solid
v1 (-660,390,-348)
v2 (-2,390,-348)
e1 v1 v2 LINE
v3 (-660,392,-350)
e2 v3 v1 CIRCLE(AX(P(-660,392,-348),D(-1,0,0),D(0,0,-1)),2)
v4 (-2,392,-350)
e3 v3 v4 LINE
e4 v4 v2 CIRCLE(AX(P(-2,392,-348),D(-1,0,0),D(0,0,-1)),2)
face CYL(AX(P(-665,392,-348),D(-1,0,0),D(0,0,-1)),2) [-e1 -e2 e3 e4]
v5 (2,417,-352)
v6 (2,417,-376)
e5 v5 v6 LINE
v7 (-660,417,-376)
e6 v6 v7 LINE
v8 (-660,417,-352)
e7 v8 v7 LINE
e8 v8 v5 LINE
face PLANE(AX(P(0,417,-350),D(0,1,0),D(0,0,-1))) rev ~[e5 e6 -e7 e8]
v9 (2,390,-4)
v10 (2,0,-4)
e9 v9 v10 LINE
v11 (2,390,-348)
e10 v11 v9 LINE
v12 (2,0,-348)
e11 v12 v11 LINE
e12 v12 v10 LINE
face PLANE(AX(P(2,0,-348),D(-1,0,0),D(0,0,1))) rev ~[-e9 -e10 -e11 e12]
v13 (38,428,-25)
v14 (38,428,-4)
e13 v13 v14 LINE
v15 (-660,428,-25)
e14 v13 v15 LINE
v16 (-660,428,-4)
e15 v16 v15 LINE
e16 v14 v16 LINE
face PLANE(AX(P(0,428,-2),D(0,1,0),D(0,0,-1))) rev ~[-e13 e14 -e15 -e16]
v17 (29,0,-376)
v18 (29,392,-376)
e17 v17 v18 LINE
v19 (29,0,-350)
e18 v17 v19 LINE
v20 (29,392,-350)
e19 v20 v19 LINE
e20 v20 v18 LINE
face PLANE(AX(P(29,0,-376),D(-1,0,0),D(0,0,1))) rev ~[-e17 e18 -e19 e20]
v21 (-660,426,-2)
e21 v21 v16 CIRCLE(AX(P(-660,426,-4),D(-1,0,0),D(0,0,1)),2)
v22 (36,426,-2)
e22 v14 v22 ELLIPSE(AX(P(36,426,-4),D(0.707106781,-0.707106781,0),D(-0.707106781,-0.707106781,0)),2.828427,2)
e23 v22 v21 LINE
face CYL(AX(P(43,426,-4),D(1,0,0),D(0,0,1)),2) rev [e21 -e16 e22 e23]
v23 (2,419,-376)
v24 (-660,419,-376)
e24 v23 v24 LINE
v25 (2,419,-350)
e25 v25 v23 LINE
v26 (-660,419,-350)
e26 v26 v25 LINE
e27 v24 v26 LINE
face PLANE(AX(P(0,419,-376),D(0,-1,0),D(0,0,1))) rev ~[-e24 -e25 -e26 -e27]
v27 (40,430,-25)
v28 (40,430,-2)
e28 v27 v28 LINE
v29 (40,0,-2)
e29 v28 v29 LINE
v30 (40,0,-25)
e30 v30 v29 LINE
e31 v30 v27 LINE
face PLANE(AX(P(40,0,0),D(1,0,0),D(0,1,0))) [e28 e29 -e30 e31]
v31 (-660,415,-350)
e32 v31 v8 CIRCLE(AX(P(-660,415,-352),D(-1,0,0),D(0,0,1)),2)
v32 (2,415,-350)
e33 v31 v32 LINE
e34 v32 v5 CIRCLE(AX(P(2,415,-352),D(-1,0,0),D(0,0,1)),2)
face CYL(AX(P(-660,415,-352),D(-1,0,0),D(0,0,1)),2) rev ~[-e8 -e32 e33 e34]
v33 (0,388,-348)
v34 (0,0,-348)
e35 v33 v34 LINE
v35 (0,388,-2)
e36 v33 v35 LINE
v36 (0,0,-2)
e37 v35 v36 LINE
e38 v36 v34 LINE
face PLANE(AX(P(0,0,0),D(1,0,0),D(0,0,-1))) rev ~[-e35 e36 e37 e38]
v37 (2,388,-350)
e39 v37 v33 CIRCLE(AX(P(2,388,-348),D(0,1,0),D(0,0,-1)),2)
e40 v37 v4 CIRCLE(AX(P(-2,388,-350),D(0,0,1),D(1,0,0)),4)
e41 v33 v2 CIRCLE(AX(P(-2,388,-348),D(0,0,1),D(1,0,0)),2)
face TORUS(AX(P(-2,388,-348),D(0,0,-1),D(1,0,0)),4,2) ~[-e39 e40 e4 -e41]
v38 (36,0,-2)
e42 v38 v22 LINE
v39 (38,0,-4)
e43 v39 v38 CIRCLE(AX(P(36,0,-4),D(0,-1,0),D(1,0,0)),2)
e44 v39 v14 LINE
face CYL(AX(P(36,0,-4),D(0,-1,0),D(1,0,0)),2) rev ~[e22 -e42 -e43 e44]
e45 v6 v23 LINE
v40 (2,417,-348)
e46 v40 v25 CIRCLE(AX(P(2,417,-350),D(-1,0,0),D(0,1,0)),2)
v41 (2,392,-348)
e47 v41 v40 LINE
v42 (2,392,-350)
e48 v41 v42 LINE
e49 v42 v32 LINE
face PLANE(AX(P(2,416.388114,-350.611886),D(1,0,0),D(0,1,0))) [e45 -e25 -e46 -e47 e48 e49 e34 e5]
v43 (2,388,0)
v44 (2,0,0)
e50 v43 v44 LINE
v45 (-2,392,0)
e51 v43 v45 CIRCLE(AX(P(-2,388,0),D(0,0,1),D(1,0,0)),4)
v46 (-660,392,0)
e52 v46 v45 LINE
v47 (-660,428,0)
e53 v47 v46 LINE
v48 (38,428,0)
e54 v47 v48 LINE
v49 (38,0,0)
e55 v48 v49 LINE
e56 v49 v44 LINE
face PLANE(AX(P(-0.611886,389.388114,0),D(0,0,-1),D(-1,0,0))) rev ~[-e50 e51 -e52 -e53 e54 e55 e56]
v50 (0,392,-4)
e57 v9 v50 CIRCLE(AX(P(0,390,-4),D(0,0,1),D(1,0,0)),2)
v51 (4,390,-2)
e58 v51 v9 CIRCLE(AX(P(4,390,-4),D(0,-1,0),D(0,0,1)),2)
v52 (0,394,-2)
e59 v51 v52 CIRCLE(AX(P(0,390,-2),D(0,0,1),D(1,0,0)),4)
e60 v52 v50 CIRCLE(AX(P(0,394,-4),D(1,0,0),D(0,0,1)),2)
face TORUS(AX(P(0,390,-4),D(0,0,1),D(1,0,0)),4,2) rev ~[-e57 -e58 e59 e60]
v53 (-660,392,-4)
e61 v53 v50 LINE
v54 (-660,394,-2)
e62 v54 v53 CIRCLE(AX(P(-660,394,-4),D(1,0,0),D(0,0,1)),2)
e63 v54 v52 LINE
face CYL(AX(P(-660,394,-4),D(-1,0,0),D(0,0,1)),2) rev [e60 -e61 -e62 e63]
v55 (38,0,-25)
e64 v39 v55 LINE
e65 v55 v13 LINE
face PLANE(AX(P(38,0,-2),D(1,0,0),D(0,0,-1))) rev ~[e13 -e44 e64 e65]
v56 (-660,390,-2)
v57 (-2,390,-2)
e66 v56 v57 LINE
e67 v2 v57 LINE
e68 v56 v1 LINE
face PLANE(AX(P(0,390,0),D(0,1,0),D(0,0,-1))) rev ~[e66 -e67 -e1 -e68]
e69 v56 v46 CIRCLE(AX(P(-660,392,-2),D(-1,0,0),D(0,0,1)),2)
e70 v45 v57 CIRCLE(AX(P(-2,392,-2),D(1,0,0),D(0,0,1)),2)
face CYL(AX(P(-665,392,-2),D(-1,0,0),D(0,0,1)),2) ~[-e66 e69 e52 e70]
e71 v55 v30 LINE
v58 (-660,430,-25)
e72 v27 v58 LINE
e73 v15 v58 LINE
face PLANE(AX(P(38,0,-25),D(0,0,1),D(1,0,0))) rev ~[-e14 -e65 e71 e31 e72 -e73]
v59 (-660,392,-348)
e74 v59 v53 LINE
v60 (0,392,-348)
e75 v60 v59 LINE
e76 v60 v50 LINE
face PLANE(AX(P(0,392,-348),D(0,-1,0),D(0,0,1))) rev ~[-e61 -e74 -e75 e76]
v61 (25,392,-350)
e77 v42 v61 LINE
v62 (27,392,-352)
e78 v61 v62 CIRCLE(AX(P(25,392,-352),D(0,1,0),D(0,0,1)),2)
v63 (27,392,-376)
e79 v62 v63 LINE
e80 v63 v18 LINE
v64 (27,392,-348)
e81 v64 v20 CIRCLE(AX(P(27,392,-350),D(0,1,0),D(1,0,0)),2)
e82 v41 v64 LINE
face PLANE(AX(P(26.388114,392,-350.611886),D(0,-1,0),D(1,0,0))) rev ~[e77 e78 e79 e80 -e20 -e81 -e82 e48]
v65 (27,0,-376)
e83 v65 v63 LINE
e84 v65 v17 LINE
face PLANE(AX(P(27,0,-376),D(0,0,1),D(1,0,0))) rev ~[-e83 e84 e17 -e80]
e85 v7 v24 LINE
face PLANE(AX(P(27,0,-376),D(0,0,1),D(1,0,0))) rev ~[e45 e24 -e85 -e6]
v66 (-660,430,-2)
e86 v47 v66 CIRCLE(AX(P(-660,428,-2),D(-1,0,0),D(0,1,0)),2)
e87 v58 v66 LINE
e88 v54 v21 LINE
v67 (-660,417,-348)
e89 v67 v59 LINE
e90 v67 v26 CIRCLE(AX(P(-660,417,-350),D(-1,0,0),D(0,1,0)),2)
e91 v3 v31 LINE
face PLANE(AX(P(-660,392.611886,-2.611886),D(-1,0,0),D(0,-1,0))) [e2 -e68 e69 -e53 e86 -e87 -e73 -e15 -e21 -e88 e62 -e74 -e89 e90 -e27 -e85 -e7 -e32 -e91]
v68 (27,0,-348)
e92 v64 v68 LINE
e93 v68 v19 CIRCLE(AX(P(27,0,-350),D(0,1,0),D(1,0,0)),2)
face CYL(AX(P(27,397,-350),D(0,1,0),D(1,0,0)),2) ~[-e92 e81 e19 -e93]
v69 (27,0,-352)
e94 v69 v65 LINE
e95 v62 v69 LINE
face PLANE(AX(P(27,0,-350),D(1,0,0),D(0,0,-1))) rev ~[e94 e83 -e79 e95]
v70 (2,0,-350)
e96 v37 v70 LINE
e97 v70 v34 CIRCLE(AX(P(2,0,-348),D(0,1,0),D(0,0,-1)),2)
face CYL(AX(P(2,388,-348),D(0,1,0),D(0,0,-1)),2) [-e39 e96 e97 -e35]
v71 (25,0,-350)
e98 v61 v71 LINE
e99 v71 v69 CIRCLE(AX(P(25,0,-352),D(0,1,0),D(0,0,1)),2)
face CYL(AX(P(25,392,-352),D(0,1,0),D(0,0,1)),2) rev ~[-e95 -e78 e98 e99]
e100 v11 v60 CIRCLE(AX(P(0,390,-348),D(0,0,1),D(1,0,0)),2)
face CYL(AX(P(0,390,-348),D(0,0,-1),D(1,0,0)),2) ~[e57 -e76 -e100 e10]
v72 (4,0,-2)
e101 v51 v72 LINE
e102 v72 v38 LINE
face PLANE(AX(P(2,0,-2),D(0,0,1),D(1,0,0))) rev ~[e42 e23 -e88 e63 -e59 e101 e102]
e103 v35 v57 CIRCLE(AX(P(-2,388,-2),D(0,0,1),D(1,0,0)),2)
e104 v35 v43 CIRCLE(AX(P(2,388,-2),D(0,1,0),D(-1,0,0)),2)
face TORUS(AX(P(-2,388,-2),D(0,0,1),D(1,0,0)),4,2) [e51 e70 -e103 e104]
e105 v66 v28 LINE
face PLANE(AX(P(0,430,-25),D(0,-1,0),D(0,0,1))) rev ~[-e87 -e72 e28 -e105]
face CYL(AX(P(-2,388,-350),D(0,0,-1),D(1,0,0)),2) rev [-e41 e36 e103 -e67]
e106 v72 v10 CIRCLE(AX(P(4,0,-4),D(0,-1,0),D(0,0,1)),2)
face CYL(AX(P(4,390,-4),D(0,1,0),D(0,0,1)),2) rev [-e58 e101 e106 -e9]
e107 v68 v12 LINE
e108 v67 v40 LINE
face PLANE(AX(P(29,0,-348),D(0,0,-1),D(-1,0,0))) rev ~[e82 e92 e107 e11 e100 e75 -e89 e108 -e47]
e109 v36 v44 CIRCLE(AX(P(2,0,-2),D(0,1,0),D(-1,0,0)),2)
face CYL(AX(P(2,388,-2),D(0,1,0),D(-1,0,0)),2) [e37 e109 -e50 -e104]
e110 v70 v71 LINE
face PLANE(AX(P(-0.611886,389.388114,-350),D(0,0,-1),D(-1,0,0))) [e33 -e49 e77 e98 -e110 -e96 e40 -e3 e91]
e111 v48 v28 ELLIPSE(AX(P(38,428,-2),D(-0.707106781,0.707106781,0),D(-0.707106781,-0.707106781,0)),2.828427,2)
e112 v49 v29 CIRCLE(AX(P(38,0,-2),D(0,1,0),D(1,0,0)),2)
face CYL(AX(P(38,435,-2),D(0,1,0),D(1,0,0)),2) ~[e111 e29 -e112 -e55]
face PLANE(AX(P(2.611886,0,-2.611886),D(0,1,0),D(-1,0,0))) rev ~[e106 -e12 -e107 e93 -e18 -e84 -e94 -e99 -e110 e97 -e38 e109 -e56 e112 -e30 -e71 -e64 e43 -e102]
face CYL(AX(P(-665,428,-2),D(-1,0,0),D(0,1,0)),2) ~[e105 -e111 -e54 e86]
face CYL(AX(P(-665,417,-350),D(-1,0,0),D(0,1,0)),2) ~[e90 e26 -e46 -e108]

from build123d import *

# Parameters (mm, degrees)
F3_W         = 27
F3_H         = 27
F4_DEPTH     = 30
F5_T1_DEPTH  = 662
F5_T3_DEPTH  = 392
F5_T5_DEPTH  = 350
F5_T10_DEPTH = 433
F5_T15_DEPTH = 703
F5_T17_DEPTH = 402
F5_T19_DEPTH = 672
F5_T21_DEPTH = 710
F5_T23_DEPTH = 440
F5_T25_DEPTH = 346
F5_T27_DEPTH = 390
F5_T29_DEPTH = 660
F5_T32_ANGLE = 90
F5_T33_DEPTH = 393
F5_T35_DEPTH = 663
F5_T38_ANGLE = 90
F5_T40_ANGLE = 90


# Not quite as in the source:
# - a fillet or chamfer that OpenCascade refuses, or shapes differently, is made with other operations: its cross-section is extruded or revolved along the edge and cut away or added


with BuildPart() as f2:
    # F2: sweep along a path in F1
    with BuildLine(Plane.XY) as f2_path:
        Line((0, 0), (0, 390))
        Line((0, 390), (-660, 390))
    # F0 (on Front) → F2 (sweep)
    with BuildSketch(Plane.XZ):
        Polygon((38, -2), (38, -25), (40, -25), (40, 0), (0, 0), (0, -350), (27, -350), (27, -376), (29, -376), (29, -348), (2, -348), (2, -2), align=None)
    sweep(path=f2_path.line, transition=Transition.RIGHT)

    # F3 (on face) → F4 (cut)
    with BuildSketch(Plane.XY.offset(-348)):
        with Locations((15.5, 405.5)):
            Rectangle(F3_W, F3_H)
    extrude(amount=-F4_DEPTH, mode=Mode.SUBTRACT)

    # F5: fillet of radius 2 on 16 edges, made by hand

    # F5_s2 → F5_t1 (join)
    with BuildSketch(Plane.YZ.offset(-660)):
        with BuildLine():
            ThreePointArc((415, -350), (416.4142135624, -350.5857864376), (417, -352))
            Line((417, -352), (417, -350))
            Line((417, -350), (415, -350))
        make_face()
    extrude(amount=F5_T1_DEPTH)

    # F5_s4 → F5_t3 (join)
    with BuildSketch(Plane.XZ.offset(-392)):
        with BuildLine():
            ThreePointArc((25, -350), (26.4142135624, -350.5857864376), (27, -352))
            Line((27, -352), (27, -350))
            Line((27, -350), (25, -350))
        make_face()
    extrude(amount=F5_T3_DEPTH)

    # F5_s6 → F5_t5 (join)
    with BuildSketch(Plane.XY.offset(-350)):
        with BuildLine():
            ThreePointArc((0, 388), (-0.5857864376, 389.4142135624), (-2, 390))
            Line((-2, 390), (0, 390))
            Line((0, 390), (0, 388))
        make_face()
    extrude(amount=F5_T5_DEPTH)


with BuildPart() as f5_tool8:
    # F5_s9 → F5_t10 (new body)
    with BuildSketch(Plane.XZ):
        with BuildLine():
            ThreePointArc((38, -4), (37.4142135624, -2.5857864376), (36, -2))
            Line((36, -2), (38, -2))
            Line((38, -2), (38, -4))
        make_face()
    extrude(amount=-F5_T10_DEPTH)

    split(bisect_by=Plane.XZ.offset(-430), keep=Keep.TOP)


with BuildPart() as f2_1:
    add(f2.part)

    # F5_t7: union F5_tool8
    add(f5_tool8.part)


with BuildPart() as f5_tool13:
    # F5_s14 → F5_t15 (new body)
    with BuildSketch(Plane.YZ.offset(43)):
        with BuildLine():
            ThreePointArc((426, -2), (427.4142135624, -2.5857864376), (428, -4))
            Line((428, -4), (428, -2))
            Line((428, -2), (426, -2))
        make_face()
    extrude(amount=-F5_T15_DEPTH)

    split(bisect_by=Plane.YZ.offset(40), keep=Keep.BOTTOM)


with BuildPart() as f2_2:
    add(f2_1.part)

    # F5_t12: union F5_tool13
    add(f5_tool13.part)

    # F5_s18 → F5_t17 (cut)
    with BuildSketch(Plane.XZ.offset(-397)):
        with BuildLine():
            ThreePointArc((29, -350), (28.4142135624, -348.5857864376), (27, -348))
            Line((27, -348), (29, -348))
            Line((29, -348), (29, -350))
        make_face()
    extrude(amount=F5_T17_DEPTH, mode=Mode.SUBTRACT)

    # F5_s20 → F5_t19 (cut)
    with BuildSketch(Plane.YZ.offset(-665)):
        with BuildLine():
            ThreePointArc((419, -350), (418.4142135624, -348.5857864376), (417, -348))
            Line((417, -348), (419, -348))
            Line((419, -348), (419, -350))
        make_face()
    extrude(amount=F5_T19_DEPTH, mode=Mode.SUBTRACT)

    # F5_s22 → F5_t21 (cut)
    with BuildSketch(Plane.YZ.offset(-665)):
        with BuildLine():
            ThreePointArc((430, -2), (429.4142135624, -0.5857864376), (428, 0))
            Line((428, 0), (430, 0))
            Line((430, 0), (430, -2))
        make_face()
    extrude(amount=F5_T21_DEPTH, mode=Mode.SUBTRACT)

    # F5_s24 → F5_t23 (cut)
    with BuildSketch(Plane.XZ.offset(-435)):
        with BuildLine():
            ThreePointArc((40, -2), (39.4142135624, -0.5857864376), (38, 0))
            Line((38, 0), (40, 0))
            Line((40, 0), (40, -2))
        make_face()
    extrude(amount=F5_T23_DEPTH, mode=Mode.SUBTRACT)

    # F5_s26 → F5_t25 (cut)
    with BuildSketch(Plane.XY.offset(-348)):
        with BuildLine():
            ThreePointArc((2, 390), (1.4142135624, 391.4142135624), (0, 392))
            Line((0, 392), (2, 392))
            Line((2, 392), (2, 390))
        make_face()
    extrude(amount=F5_T25_DEPTH, mode=Mode.SUBTRACT)

    # F5_s28 → F5_t27 (join)
    with BuildSketch(Plane.XZ.offset(-390)):
        with BuildLine():
            ThreePointArc((4, -2), (2.5857864376, -2.5857864376), (2, -4))
            Line((2, -4), (2, -2))
            Line((2, -2), (4, -2))
        make_face()
    extrude(amount=F5_T27_DEPTH)

    # F5_s30 → F5_t29 (join)
    with BuildSketch(Plane.YZ.offset(-660)):
        with BuildLine():
            ThreePointArc((394, -2), (392.5857864376, -2.5857864376), (392, -4))
            Line((392, -4), (392, -2))
            Line((392, -2), (394, -2))
        make_face()
    extrude(amount=F5_T29_DEPTH)

    # F5_s31 → F5_t32 (revolve)
    with BuildSketch(Plane.XZ.offset(-390)):
        with BuildLine():
            ThreePointArc((4, -2), (2.5857864376, -2.5857864376), (2, -4))
            Line((2, -4), (2, -2))
            Line((2, -2), (4, -2))
        make_face()
    revolve(axis=Axis((0, 390, -2), (0, 0, 1)), revolution_arc=F5_T32_ANGLE)

    # F5_s34 → F5_t33 (cut)
    with BuildSketch(Plane.XZ.offset(-388)):
        with BuildLine():
            ThreePointArc((2, -350), (0.5857864376, -349.4142135624), (0, -348))
            Line((0, -348), (0, -350))
            Line((0, -350), (2, -350))
        make_face()
        with BuildLine():
            ThreePointArc((0, -2), (0.5857864376, -0.5857864376), (2, 0))
            Line((2, 0), (0, 0))
            Line((0, 0), (0, -2))
        make_face()
    extrude(amount=F5_T33_DEPTH, mode=Mode.SUBTRACT)

    # F5_s36 → F5_t35 (cut)
    with BuildSketch(Plane.YZ.offset(-665)):
        with BuildLine():
            ThreePointArc((392, -350), (390.5857864376, -349.4142135624), (390, -348))
            Line((390, -348), (390, -350))
            Line((390, -350), (392, -350))
        make_face()
        with BuildLine():
            ThreePointArc((392, 0), (390.5857864376, -0.5857864376), (390, -2))
            Line((390, -2), (390, 0))
            Line((390, 0), (392, 0))
        make_face()
    extrude(amount=F5_T35_DEPTH, mode=Mode.SUBTRACT)

    # F5_s37 → F5_t38 (revolve, cut)
    with BuildSketch(Plane.XZ.offset(-388)):
        with BuildLine():
            ThreePointArc((2, 0), (0.5857864376, -0.5857864376), (0, -2))
            Line((0, -2), (0, 0))
            Line((0, 0), (2, 0))
        make_face()
    revolve(axis=Axis((-2, 388, 0), (0, 0, 1)), revolution_arc=F5_T38_ANGLE, mode=Mode.SUBTRACT)

    # F5_s39 → F5_t40 (revolve, cut)
    with BuildSketch(Plane.XZ.offset(-388)):
        with BuildLine():
            ThreePointArc((2, -350), (0.5857864376, -349.4142135624), (0, -348))
            Line((0, -348), (0, -350))
            Line((0, -350), (2, -350))
        make_face()
    revolve(axis=Axis((-2, 388, -350), (0, 0, 1)), revolution_arc=F5_T40_ANGLE, mode=Mode.SUBTRACT)


solid = f2_2.part
